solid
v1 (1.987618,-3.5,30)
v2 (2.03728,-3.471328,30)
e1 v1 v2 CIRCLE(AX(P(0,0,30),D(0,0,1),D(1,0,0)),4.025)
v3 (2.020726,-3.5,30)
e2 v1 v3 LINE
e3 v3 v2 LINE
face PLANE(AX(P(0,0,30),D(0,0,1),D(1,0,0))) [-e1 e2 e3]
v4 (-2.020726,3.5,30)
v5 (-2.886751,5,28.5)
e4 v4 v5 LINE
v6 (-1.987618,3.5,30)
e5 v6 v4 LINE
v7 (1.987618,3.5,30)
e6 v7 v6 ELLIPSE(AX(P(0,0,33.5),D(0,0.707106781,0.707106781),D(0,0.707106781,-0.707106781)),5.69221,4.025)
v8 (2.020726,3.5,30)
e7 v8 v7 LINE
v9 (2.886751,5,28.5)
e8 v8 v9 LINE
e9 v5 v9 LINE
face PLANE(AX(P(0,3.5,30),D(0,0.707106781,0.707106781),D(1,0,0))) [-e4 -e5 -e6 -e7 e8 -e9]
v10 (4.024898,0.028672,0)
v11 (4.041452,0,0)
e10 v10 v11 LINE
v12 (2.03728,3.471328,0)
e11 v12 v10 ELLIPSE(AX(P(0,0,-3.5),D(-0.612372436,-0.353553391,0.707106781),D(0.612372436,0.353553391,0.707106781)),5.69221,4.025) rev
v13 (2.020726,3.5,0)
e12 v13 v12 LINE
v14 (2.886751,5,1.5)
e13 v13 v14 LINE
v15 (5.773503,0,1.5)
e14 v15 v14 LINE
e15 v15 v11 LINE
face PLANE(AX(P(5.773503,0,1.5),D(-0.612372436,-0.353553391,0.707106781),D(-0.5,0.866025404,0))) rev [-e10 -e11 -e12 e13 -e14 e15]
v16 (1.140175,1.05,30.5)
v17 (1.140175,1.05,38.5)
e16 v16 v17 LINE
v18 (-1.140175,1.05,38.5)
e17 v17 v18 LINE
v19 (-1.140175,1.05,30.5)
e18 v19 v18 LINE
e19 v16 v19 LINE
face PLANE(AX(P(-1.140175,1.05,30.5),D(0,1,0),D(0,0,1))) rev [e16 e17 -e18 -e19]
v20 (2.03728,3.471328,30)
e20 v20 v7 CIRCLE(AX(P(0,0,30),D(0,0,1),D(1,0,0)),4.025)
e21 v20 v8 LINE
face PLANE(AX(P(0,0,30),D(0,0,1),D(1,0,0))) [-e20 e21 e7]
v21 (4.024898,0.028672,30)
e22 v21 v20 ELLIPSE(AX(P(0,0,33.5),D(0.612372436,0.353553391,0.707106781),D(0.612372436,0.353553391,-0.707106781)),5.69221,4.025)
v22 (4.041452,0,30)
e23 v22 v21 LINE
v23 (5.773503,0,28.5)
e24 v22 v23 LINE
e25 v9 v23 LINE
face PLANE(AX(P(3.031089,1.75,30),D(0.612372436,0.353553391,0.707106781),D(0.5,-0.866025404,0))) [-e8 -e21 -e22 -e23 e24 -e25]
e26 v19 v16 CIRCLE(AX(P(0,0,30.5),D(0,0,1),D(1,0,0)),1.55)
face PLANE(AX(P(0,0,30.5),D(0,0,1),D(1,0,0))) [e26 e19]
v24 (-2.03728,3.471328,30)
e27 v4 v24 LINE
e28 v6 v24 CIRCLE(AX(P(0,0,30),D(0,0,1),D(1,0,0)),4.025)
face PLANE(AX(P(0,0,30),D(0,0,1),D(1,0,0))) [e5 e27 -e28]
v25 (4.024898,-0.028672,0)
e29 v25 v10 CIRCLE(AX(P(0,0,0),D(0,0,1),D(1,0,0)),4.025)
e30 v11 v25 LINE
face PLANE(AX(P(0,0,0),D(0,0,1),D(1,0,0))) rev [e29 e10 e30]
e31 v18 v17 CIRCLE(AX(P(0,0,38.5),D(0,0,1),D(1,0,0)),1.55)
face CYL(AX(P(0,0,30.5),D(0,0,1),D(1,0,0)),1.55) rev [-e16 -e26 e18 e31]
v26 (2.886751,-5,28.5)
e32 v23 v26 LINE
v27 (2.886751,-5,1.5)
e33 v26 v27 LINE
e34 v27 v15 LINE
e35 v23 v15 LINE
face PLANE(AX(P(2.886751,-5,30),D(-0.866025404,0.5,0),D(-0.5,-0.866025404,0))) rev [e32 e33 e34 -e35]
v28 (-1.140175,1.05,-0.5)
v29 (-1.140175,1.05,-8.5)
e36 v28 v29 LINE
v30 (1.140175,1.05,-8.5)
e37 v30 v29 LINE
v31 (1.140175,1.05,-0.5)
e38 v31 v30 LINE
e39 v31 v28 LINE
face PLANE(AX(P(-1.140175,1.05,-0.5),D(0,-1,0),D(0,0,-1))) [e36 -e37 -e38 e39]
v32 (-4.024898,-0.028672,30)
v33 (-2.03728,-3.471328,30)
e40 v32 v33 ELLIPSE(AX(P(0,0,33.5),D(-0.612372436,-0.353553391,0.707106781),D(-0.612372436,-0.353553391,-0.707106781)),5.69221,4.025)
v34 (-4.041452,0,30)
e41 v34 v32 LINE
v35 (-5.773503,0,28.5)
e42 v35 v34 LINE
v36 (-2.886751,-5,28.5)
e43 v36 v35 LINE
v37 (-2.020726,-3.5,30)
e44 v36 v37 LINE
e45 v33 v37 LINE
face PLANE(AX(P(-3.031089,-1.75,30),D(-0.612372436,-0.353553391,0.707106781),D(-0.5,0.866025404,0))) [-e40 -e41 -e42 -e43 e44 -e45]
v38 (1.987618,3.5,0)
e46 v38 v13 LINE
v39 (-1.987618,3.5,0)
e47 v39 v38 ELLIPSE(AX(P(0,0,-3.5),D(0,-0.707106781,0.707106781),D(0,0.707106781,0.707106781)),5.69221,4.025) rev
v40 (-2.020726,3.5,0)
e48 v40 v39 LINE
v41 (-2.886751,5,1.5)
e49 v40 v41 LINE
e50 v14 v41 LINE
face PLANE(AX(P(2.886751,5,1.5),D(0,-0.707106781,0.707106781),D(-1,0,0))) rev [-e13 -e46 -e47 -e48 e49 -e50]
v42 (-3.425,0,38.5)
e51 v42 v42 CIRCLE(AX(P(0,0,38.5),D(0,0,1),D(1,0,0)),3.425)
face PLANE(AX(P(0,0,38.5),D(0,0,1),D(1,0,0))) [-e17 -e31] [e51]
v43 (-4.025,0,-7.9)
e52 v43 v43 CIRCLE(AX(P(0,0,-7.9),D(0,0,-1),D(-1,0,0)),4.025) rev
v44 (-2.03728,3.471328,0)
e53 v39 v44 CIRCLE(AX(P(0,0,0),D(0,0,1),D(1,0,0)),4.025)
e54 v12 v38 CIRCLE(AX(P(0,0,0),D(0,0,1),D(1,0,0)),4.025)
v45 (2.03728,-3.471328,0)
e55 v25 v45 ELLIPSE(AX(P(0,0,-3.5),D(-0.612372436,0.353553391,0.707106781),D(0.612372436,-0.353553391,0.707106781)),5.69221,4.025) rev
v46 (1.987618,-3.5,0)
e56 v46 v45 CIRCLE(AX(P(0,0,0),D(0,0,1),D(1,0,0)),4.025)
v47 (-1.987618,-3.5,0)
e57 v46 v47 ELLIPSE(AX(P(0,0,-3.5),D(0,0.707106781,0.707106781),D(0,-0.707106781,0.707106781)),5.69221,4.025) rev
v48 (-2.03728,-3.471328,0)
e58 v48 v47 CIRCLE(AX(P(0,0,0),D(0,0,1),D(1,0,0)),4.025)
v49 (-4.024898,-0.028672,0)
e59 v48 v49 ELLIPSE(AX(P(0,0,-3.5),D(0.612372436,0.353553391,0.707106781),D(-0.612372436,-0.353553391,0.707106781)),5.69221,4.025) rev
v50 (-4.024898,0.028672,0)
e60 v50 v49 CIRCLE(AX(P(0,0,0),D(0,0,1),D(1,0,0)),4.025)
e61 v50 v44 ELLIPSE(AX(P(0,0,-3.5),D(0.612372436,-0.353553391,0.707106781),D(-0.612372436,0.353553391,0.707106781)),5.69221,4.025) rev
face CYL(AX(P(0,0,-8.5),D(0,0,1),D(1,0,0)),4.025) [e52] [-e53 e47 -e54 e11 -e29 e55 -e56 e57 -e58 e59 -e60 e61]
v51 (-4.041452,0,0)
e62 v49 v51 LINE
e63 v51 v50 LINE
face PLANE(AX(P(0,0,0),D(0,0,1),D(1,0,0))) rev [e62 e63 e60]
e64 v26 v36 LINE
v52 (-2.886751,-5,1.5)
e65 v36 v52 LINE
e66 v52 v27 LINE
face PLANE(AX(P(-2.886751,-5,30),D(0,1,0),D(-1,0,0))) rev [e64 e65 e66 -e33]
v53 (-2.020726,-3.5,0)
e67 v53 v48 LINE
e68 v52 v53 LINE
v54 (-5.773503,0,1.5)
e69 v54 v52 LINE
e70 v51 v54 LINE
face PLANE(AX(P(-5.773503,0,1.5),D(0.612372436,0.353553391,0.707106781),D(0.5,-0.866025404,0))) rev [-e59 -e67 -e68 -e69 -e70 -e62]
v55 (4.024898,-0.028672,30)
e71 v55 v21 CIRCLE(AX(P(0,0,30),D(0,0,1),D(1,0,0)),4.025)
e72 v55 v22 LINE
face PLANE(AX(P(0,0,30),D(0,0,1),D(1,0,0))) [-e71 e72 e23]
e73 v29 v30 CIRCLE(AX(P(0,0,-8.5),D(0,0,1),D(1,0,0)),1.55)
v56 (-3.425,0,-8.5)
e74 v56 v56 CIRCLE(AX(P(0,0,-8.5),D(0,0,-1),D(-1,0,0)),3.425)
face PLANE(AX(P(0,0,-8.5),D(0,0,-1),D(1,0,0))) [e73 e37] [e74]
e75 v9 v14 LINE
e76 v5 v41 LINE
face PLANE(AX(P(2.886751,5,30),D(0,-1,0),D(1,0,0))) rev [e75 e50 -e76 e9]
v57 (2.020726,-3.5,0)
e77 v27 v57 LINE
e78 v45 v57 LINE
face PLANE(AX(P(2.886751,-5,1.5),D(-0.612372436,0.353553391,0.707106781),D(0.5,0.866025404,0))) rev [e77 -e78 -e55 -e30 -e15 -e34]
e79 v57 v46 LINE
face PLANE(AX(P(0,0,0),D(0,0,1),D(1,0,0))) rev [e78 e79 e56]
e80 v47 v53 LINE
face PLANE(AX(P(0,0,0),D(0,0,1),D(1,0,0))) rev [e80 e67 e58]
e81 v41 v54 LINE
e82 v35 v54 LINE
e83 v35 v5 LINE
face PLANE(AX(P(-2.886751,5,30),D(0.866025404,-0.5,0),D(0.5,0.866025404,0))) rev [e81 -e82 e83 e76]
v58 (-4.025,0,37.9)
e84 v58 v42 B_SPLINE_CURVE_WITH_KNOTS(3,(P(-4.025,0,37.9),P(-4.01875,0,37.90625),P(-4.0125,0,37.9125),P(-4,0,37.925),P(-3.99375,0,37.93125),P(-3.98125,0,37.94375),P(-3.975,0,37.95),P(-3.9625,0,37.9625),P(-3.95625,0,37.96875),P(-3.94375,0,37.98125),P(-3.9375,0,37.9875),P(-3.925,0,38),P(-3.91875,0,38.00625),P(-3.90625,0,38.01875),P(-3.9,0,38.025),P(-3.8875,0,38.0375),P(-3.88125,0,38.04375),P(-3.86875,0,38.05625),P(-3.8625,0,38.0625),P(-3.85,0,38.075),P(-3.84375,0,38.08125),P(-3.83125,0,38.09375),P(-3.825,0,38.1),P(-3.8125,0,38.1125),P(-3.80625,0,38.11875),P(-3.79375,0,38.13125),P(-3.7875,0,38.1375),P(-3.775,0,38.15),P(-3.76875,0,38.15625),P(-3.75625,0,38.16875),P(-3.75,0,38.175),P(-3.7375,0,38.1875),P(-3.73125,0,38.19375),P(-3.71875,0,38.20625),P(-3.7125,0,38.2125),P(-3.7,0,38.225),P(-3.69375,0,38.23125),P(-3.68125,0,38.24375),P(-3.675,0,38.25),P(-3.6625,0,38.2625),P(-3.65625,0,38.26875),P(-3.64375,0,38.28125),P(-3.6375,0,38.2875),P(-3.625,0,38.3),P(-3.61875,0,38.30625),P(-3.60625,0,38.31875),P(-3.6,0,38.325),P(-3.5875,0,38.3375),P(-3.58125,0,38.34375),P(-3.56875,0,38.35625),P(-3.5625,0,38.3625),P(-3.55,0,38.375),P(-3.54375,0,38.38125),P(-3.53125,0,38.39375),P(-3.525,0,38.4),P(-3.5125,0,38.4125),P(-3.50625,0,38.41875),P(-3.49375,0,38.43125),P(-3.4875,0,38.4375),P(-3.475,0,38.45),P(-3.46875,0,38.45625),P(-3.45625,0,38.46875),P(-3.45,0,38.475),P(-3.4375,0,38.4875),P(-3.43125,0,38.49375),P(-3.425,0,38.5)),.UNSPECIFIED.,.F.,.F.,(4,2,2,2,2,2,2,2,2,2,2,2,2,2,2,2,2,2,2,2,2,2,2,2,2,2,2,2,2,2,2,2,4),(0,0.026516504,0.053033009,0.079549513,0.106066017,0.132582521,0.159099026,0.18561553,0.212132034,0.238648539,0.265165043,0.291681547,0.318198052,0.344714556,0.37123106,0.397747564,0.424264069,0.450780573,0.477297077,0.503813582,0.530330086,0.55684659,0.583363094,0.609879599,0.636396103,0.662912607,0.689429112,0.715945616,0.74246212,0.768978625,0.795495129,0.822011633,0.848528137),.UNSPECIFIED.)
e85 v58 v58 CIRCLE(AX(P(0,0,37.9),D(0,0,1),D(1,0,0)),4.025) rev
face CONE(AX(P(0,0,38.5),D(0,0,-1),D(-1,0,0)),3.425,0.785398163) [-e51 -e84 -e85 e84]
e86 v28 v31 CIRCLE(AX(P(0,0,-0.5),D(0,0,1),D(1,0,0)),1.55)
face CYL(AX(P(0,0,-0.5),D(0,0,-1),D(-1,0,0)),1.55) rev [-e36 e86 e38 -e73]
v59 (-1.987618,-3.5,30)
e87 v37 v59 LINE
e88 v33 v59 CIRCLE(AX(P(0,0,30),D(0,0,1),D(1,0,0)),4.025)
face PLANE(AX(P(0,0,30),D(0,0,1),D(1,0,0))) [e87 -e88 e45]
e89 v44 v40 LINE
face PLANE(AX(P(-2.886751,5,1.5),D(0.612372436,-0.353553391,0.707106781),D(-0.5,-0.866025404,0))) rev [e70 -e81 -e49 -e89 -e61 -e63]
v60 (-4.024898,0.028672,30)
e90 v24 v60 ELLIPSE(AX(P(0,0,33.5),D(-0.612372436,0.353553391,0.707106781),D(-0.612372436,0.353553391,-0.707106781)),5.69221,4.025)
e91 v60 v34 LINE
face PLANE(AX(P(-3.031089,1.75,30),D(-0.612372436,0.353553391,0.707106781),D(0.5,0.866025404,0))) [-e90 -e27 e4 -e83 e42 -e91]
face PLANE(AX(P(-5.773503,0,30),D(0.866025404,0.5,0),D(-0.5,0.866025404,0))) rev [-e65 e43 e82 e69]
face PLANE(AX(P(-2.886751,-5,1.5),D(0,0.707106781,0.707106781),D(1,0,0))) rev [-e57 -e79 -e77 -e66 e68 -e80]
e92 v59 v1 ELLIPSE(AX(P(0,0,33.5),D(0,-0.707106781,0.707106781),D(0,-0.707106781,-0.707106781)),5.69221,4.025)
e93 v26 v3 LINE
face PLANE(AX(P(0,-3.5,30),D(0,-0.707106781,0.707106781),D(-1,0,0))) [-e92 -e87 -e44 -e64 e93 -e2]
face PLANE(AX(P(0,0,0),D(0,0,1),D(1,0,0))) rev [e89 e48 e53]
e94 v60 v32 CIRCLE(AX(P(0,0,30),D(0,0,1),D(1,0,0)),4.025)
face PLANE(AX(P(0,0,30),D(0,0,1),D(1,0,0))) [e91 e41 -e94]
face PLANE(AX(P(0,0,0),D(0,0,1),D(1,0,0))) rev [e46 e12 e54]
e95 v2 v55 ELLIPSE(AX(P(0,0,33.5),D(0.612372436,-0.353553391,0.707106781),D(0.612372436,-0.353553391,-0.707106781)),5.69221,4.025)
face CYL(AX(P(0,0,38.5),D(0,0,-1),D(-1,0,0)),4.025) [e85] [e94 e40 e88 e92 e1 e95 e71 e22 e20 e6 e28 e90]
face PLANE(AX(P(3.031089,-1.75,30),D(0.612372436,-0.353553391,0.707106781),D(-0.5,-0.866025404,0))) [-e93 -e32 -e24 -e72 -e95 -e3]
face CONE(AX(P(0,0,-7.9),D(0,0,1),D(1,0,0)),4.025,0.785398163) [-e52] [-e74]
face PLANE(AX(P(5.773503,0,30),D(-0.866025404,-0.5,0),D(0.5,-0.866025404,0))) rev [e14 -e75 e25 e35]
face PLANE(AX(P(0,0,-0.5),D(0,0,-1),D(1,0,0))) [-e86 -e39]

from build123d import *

# Parameters (mm, degrees)
EXTRUDE_1_DEPTH            = 30
SKETCH_2_R                 = 4.025
EXTRUDE_2_DEPTH            = 8.5
CHAMFER_1_SIZE             = 0.6
CUT_EXTRUDE_1_DEPTH        = 8
CHAMFER_1_OF_MIRROR_1_SIZE = 0.6
CHAMFER_2_SIZE             = 1.5


with BuildPart() as part:
    # 草图1 → 凸台-拉伸1 (new body)
    with BuildSketch(Plane.XY):
        Polygon((5.773502692, 0), (2.886751346, 5), (-2.886751346, 5), (-5.773502692, 0), (-2.886751346, -5), (2.886751346, -5), align=None)
    extrude(amount=EXTRUDE_1_DEPTH)

    # 草图2 → 凸台-拉伸2 (add)
    with BuildSketch(Plane.XY.offset(30)):
        Circle(SKETCH_2_R)
    extrude_2 = extrude(amount=EXTRUDE_2_DEPTH)

    # 倒角1
    chamfer_1_edges = [part.edges().sort_by_distance(p)[0] for p in [
        (-4.025, 0, 38.5),
    ]]
    chamfer(chamfer_1_edges, length=CHAMFER_1_SIZE)

    # 草图3 → 切除-拉伸1 (cut)
    with BuildSketch(Plane.XY.offset(38.5)):
        with BuildLine():
            Line((-1.140175425, 1.05), (1.140175425, 1.05))
            ThreePointArc((1.140175425, 1.05), (0, -1.55), (-1.140175425, 1.05))
        make_face()
    cut_extrude_1 = extrude(amount=-CUT_EXTRUDE_1_DEPTH, mode=Mode.SUBTRACT)

    # 镜向1: 凸台-拉伸2, 切除-拉伸1 across plane
    add(extrude_2.mirror(Plane.XY.offset(15)))
    add(cut_extrude_1.mirror(Plane.XY.offset(15)), mode=Mode.SUBTRACT)

    # 倒角1 of 镜向1
    chamfer_1_of_mirror_1_edges = [part.edges().sort_by_distance(p)[0] for p in [
        (-4.025, 0, -8.5),
    ]]
    chamfer(chamfer_1_of_mirror_1_edges, length=CHAMFER_1_OF_MIRROR_1_SIZE)

    # 倒角2
    # the kernel refuses this chamfer: 1.5 mm, written as the material it takes off along each edge
    with BuildSketch(Plane(origin=(6.744275828, 5, 30), x_dir=(0, 0.02749587661058619, -0.9996219169112968), z_dir=(-1, 0, 0))) as chamfer_2_piece_1_section:
        Polygon((CHAMFER_2_SIZE * 0.999621916911, CHAMFER_2_SIZE * 0.0274958766106), (-CHAMFER_2_SIZE * 0.0274958766106, CHAMFER_2_SIZE * 0.999621916911), (0, 0), align=None)
    chamfer_2_piece_1 = extrude(amount=13.488551656, mode=Mode.PRIVATE)
    chamfer_2_piece_1 = chamfer_2_piece_1 - Plane(origin=(0, 0, 29.496283427), x_dir=(1, 0, 0), z_dir=(0, 0, -1)) * Cylinder(4.025, 33, mode=Mode.PRIVATE)
    add(chamfer_2_piece_1, mode=Mode.SUBTRACT)
    with BuildSketch(Plane(origin=(-0.957989105, 8.340714197, 30), x_dir=(-0.02381212764409015, 0.013747938305292993, -0.9996219169112968), z_dir=(-0.49999999999999506, -0.8660254037844416, 0))) as chamfer_2_piece_2_section:
        Polygon((CHAMFER_2_SIZE * 0.999621916911, CHAMFER_2_SIZE * 0.0274958766106), (-CHAMFER_2_SIZE * 0.0274958766106, CHAMFER_2_SIZE * 0.999621916911), (0, 0), align=None)
    chamfer_2_piece_2 = extrude(amount=13.488551656, mode=Mode.PRIVATE)
    chamfer_2_piece_2 = chamfer_2_piece_2 - Plane(origin=(0, 0, 29.496283427), x_dir=(1, 0, 0), z_dir=(0, 0, -1)) * Cylinder(4.025, 33, mode=Mode.PRIVATE)
    add(chamfer_2_piece_2, mode=Mode.SUBTRACT)
    with BuildSketch(Plane(origin=(-7.702264933, 3.340714197, 30), x_dir=(-0.023812127644089943, -0.013747938305293316, -0.9996219169112968), z_dir=(0.5000000000000071, -0.8660254037844346, 0))) as chamfer_2_piece_3_section:
        Polygon((CHAMFER_2_SIZE * 0.999621916911, CHAMFER_2_SIZE * 0.0274958766106), (-CHAMFER_2_SIZE * 0.0274958766106, CHAMFER_2_SIZE * 0.999621916911), (0, 0), align=None)
    chamfer_2_piece_3 = extrude(amount=13.488551656, mode=Mode.PRIVATE)
    chamfer_2_piece_3 = chamfer_2_piece_3 - Plane(origin=(0, 0, 29.496283427), x_dir=(1, 0, 0), z_dir=(0, 0, -1)) * Cylinder(4.025, 33, mode=Mode.PRIVATE)
    add(chamfer_2_piece_3, mode=Mode.SUBTRACT)
    with BuildSketch(Plane(origin=(-6.744275828, -5, 30), x_dir=(0, -0.02749587661058619, -0.9996219169112968), z_dir=(1, 0, 0))) as chamfer_2_piece_4_section:
        Polygon((CHAMFER_2_SIZE * 0.999621916911, CHAMFER_2_SIZE * 0.0274958766106), (-CHAMFER_2_SIZE * 0.0274958766106, CHAMFER_2_SIZE * 0.999621916911), (0, 0), align=None)
    chamfer_2_piece_4 = extrude(amount=13.488551656, mode=Mode.PRIVATE)
    chamfer_2_piece_4 = chamfer_2_piece_4 - Plane(origin=(0, 0, 29.496283427), x_dir=(1, 0, 0), z_dir=(0, 0, -1)) * Cylinder(4.025, 33, mode=Mode.PRIVATE)
    add(chamfer_2_piece_4, mode=Mode.SUBTRACT)
    with BuildSketch(Plane(origin=(0.957989105, -8.340714197, 30), x_dir=(0.02381212764409026, -0.013747938305293058, -0.9996219169112968), z_dir=(0.49999999999999506, 0.8660254037844416, 0))) as chamfer_2_piece_5_section:
        Polygon((CHAMFER_2_SIZE * 0.999621916911, CHAMFER_2_SIZE * 0.0274958766106), (-CHAMFER_2_SIZE * 0.0274958766106, CHAMFER_2_SIZE * 0.999621916911), (0, 0), align=None)
    chamfer_2_piece_5 = extrude(amount=13.488551656, mode=Mode.PRIVATE)
    chamfer_2_piece_5 = chamfer_2_piece_5 - Plane(origin=(0, 0, 29.496283427), x_dir=(1, 0, 0), z_dir=(0, 0, -1)) * Cylinder(4.025, 33, mode=Mode.PRIVATE)
    add(chamfer_2_piece_5, mode=Mode.SUBTRACT)
    with BuildSketch(Plane(origin=(-6.744275828, -5, 0), x_dir=(-1.0610740769848241e-14, 0.9996219169112969, -0.027495876610586372), z_dir=(1, 0, 0))) as chamfer_2_piece_6_section:
        Polygon((CHAMFER_2_SIZE * 0.999621916911, CHAMFER_2_SIZE * 0.0274958766106), (-CHAMFER_2_SIZE * 0.0274958766106, CHAMFER_2_SIZE * 0.999621916911), (0, 0), align=None)
    chamfer_2_piece_6 = extrude(amount=13.488551656, mode=Mode.PRIVATE)
    chamfer_2_piece_6 = chamfer_2_piece_6 - Plane(origin=(0, 0, 0.503716575), x_dir=(1, 0, 0), z_dir=(0, 0, 1)) * Cylinder(4.025, 33, mode=Mode.PRIVATE)
    add(chamfer_2_piece_6, mode=Mode.SUBTRACT)
    with BuildSketch(Plane(origin=(-7.702264933, 3.340714197, 0), x_dir=(0.8656979742248763, 0.49981095845565543, -0.027495876610586372), z_dir=(0.5000000000000071, -0.8660254037844346, 0))) as chamfer_2_piece_7_section:
        Polygon((CHAMFER_2_SIZE * 0.999621916911, CHAMFER_2_SIZE * 0.0274958766106), (-CHAMFER_2_SIZE * 0.0274958766106, CHAMFER_2_SIZE * 0.999621916911), (0, 0), align=None)
    chamfer_2_piece_7 = extrude(amount=13.488551656, mode=Mode.PRIVATE)
    chamfer_2_piece_7 = chamfer_2_piece_7 - Plane(origin=(0, 0, 0.503716575), x_dir=(1, 0, 0), z_dir=(0, 0, 1)) * Cylinder(4.025, 33, mode=Mode.PRIVATE)
    add(chamfer_2_piece_7, mode=Mode.SUBTRACT)
    with BuildSketch(Plane(origin=(-0.957989105, 8.340714197, 0), x_dir=(0.8656979742248831, -0.4998109584556434, -0.027495876610586365), z_dir=(-0.49999999999999506, -0.8660254037844416, 0))) as chamfer_2_piece_8_section:
        Polygon((CHAMFER_2_SIZE * 0.999621916911, CHAMFER_2_SIZE * 0.0274958766106), (-CHAMFER_2_SIZE * 0.0274958766106, CHAMFER_2_SIZE * 0.999621916911), (0, 0), align=None)
    chamfer_2_piece_8 = extrude(amount=13.488551656, mode=Mode.PRIVATE)
    chamfer_2_piece_8 = chamfer_2_piece_8 - Plane(origin=(0, 0, 0.503716575), x_dir=(1, 0, 0), z_dir=(0, 0, 1)) * Cylinder(4.025, 33, mode=Mode.PRIVATE)
    add(chamfer_2_piece_8, mode=Mode.SUBTRACT)
    with BuildSketch(Plane(origin=(6.744275828, 5, 0), x_dir=(3.2293558864755513e-15, -0.9996219169112969, -0.027495876610586372), z_dir=(-1, 0, 0))) as chamfer_2_piece_9_section:
        Polygon((CHAMFER_2_SIZE * 0.999621916911, CHAMFER_2_SIZE * 0.0274958766106), (-CHAMFER_2_SIZE * 0.0274958766106, CHAMFER_2_SIZE * 0.999621916911), (0, 0), align=None)
    chamfer_2_piece_9 = extrude(amount=13.488551656, mode=Mode.PRIVATE)
    chamfer_2_piece_9 = chamfer_2_piece_9 - Plane(origin=(0, 0, 0.503716575), x_dir=(1, 0, 0), z_dir=(0, 0, 1)) * Cylinder(4.025, 33, mode=Mode.PRIVATE)
    add(chamfer_2_piece_9, mode=Mode.SUBTRACT)
    with BuildSketch(Plane(origin=(7.702264933, -3.340714197, 0), x_dir=(-0.8656979742248797, -0.49981095845564943, -0.027495876610586372), z_dir=(-0.5000000000000011, 0.866025403784438, 0))) as chamfer_2_piece_10_section:
        Polygon((CHAMFER_2_SIZE * 0.999621916911, CHAMFER_2_SIZE * 0.0274958766106), (-CHAMFER_2_SIZE * 0.0274958766106, CHAMFER_2_SIZE * 0.999621916911), (0, 0), align=None)
    chamfer_2_piece_10 = extrude(amount=13.488551656, mode=Mode.PRIVATE)
    chamfer_2_piece_10 = chamfer_2_piece_10 - Plane(origin=(0, 0, 0.503716574), x_dir=(1, 0, 0), z_dir=(0, 0, 1)) * Cylinder(4.025, 33, mode=Mode.PRIVATE)
    add(chamfer_2_piece_10, mode=Mode.SUBTRACT)
    with BuildSketch(Plane(origin=(0.957989105, -8.340714197, 0), x_dir=(-0.8656979742248831, 0.4998109584556434, -0.02749587661058637), z_dir=(0.49999999999999506, 0.8660254037844416, 0))) as chamfer_2_piece_11_section:
        Polygon((CHAMFER_2_SIZE * 0.999621916911, CHAMFER_2_SIZE * 0.0274958766106), (-CHAMFER_2_SIZE * 0.0274958766106, CHAMFER_2_SIZE * 0.999621916911), (0, 0), align=None)
    chamfer_2_piece_11 = extrude(amount=13.488551656, mode=Mode.PRIVATE)
    chamfer_2_piece_11 = chamfer_2_piece_11 - Plane(origin=(0, 0, 0.503716575), x_dir=(1, 0, 0), z_dir=(0, 0, 1)) * Cylinder(4.025, 33, mode=Mode.PRIVATE)
    add(chamfer_2_piece_11, mode=Mode.SUBTRACT)
    with BuildSketch(Plane(origin=(7.702264933, -3.340714197, 30), x_dir=(0.02381212764409016, 0.013747938305293224, -0.9996219169112968), z_dir=(-0.5000000000000011, 0.866025403784438, 0))) as chamfer_2_piece_12_section:
        Polygon((CHAMFER_2_SIZE * 0.999621916911, CHAMFER_2_SIZE * 0.0274958766106), (-CHAMFER_2_SIZE * 0.0274958766106, CHAMFER_2_SIZE * 0.999621916911), (0, 0), align=None)
    chamfer_2_piece_12 = extrude(amount=13.488551656, mode=Mode.PRIVATE)
    chamfer_2_piece_12 = chamfer_2_piece_12 - Plane(origin=(0, 0, 29.496283426), x_dir=(1, 0, 0), z_dir=(0, 0, -1)) * Cylinder(4.025, 33, mode=Mode.PRIVATE)
    add(chamfer_2_piece_12, mode=Mode.SUBTRACT)


solid = part.part
